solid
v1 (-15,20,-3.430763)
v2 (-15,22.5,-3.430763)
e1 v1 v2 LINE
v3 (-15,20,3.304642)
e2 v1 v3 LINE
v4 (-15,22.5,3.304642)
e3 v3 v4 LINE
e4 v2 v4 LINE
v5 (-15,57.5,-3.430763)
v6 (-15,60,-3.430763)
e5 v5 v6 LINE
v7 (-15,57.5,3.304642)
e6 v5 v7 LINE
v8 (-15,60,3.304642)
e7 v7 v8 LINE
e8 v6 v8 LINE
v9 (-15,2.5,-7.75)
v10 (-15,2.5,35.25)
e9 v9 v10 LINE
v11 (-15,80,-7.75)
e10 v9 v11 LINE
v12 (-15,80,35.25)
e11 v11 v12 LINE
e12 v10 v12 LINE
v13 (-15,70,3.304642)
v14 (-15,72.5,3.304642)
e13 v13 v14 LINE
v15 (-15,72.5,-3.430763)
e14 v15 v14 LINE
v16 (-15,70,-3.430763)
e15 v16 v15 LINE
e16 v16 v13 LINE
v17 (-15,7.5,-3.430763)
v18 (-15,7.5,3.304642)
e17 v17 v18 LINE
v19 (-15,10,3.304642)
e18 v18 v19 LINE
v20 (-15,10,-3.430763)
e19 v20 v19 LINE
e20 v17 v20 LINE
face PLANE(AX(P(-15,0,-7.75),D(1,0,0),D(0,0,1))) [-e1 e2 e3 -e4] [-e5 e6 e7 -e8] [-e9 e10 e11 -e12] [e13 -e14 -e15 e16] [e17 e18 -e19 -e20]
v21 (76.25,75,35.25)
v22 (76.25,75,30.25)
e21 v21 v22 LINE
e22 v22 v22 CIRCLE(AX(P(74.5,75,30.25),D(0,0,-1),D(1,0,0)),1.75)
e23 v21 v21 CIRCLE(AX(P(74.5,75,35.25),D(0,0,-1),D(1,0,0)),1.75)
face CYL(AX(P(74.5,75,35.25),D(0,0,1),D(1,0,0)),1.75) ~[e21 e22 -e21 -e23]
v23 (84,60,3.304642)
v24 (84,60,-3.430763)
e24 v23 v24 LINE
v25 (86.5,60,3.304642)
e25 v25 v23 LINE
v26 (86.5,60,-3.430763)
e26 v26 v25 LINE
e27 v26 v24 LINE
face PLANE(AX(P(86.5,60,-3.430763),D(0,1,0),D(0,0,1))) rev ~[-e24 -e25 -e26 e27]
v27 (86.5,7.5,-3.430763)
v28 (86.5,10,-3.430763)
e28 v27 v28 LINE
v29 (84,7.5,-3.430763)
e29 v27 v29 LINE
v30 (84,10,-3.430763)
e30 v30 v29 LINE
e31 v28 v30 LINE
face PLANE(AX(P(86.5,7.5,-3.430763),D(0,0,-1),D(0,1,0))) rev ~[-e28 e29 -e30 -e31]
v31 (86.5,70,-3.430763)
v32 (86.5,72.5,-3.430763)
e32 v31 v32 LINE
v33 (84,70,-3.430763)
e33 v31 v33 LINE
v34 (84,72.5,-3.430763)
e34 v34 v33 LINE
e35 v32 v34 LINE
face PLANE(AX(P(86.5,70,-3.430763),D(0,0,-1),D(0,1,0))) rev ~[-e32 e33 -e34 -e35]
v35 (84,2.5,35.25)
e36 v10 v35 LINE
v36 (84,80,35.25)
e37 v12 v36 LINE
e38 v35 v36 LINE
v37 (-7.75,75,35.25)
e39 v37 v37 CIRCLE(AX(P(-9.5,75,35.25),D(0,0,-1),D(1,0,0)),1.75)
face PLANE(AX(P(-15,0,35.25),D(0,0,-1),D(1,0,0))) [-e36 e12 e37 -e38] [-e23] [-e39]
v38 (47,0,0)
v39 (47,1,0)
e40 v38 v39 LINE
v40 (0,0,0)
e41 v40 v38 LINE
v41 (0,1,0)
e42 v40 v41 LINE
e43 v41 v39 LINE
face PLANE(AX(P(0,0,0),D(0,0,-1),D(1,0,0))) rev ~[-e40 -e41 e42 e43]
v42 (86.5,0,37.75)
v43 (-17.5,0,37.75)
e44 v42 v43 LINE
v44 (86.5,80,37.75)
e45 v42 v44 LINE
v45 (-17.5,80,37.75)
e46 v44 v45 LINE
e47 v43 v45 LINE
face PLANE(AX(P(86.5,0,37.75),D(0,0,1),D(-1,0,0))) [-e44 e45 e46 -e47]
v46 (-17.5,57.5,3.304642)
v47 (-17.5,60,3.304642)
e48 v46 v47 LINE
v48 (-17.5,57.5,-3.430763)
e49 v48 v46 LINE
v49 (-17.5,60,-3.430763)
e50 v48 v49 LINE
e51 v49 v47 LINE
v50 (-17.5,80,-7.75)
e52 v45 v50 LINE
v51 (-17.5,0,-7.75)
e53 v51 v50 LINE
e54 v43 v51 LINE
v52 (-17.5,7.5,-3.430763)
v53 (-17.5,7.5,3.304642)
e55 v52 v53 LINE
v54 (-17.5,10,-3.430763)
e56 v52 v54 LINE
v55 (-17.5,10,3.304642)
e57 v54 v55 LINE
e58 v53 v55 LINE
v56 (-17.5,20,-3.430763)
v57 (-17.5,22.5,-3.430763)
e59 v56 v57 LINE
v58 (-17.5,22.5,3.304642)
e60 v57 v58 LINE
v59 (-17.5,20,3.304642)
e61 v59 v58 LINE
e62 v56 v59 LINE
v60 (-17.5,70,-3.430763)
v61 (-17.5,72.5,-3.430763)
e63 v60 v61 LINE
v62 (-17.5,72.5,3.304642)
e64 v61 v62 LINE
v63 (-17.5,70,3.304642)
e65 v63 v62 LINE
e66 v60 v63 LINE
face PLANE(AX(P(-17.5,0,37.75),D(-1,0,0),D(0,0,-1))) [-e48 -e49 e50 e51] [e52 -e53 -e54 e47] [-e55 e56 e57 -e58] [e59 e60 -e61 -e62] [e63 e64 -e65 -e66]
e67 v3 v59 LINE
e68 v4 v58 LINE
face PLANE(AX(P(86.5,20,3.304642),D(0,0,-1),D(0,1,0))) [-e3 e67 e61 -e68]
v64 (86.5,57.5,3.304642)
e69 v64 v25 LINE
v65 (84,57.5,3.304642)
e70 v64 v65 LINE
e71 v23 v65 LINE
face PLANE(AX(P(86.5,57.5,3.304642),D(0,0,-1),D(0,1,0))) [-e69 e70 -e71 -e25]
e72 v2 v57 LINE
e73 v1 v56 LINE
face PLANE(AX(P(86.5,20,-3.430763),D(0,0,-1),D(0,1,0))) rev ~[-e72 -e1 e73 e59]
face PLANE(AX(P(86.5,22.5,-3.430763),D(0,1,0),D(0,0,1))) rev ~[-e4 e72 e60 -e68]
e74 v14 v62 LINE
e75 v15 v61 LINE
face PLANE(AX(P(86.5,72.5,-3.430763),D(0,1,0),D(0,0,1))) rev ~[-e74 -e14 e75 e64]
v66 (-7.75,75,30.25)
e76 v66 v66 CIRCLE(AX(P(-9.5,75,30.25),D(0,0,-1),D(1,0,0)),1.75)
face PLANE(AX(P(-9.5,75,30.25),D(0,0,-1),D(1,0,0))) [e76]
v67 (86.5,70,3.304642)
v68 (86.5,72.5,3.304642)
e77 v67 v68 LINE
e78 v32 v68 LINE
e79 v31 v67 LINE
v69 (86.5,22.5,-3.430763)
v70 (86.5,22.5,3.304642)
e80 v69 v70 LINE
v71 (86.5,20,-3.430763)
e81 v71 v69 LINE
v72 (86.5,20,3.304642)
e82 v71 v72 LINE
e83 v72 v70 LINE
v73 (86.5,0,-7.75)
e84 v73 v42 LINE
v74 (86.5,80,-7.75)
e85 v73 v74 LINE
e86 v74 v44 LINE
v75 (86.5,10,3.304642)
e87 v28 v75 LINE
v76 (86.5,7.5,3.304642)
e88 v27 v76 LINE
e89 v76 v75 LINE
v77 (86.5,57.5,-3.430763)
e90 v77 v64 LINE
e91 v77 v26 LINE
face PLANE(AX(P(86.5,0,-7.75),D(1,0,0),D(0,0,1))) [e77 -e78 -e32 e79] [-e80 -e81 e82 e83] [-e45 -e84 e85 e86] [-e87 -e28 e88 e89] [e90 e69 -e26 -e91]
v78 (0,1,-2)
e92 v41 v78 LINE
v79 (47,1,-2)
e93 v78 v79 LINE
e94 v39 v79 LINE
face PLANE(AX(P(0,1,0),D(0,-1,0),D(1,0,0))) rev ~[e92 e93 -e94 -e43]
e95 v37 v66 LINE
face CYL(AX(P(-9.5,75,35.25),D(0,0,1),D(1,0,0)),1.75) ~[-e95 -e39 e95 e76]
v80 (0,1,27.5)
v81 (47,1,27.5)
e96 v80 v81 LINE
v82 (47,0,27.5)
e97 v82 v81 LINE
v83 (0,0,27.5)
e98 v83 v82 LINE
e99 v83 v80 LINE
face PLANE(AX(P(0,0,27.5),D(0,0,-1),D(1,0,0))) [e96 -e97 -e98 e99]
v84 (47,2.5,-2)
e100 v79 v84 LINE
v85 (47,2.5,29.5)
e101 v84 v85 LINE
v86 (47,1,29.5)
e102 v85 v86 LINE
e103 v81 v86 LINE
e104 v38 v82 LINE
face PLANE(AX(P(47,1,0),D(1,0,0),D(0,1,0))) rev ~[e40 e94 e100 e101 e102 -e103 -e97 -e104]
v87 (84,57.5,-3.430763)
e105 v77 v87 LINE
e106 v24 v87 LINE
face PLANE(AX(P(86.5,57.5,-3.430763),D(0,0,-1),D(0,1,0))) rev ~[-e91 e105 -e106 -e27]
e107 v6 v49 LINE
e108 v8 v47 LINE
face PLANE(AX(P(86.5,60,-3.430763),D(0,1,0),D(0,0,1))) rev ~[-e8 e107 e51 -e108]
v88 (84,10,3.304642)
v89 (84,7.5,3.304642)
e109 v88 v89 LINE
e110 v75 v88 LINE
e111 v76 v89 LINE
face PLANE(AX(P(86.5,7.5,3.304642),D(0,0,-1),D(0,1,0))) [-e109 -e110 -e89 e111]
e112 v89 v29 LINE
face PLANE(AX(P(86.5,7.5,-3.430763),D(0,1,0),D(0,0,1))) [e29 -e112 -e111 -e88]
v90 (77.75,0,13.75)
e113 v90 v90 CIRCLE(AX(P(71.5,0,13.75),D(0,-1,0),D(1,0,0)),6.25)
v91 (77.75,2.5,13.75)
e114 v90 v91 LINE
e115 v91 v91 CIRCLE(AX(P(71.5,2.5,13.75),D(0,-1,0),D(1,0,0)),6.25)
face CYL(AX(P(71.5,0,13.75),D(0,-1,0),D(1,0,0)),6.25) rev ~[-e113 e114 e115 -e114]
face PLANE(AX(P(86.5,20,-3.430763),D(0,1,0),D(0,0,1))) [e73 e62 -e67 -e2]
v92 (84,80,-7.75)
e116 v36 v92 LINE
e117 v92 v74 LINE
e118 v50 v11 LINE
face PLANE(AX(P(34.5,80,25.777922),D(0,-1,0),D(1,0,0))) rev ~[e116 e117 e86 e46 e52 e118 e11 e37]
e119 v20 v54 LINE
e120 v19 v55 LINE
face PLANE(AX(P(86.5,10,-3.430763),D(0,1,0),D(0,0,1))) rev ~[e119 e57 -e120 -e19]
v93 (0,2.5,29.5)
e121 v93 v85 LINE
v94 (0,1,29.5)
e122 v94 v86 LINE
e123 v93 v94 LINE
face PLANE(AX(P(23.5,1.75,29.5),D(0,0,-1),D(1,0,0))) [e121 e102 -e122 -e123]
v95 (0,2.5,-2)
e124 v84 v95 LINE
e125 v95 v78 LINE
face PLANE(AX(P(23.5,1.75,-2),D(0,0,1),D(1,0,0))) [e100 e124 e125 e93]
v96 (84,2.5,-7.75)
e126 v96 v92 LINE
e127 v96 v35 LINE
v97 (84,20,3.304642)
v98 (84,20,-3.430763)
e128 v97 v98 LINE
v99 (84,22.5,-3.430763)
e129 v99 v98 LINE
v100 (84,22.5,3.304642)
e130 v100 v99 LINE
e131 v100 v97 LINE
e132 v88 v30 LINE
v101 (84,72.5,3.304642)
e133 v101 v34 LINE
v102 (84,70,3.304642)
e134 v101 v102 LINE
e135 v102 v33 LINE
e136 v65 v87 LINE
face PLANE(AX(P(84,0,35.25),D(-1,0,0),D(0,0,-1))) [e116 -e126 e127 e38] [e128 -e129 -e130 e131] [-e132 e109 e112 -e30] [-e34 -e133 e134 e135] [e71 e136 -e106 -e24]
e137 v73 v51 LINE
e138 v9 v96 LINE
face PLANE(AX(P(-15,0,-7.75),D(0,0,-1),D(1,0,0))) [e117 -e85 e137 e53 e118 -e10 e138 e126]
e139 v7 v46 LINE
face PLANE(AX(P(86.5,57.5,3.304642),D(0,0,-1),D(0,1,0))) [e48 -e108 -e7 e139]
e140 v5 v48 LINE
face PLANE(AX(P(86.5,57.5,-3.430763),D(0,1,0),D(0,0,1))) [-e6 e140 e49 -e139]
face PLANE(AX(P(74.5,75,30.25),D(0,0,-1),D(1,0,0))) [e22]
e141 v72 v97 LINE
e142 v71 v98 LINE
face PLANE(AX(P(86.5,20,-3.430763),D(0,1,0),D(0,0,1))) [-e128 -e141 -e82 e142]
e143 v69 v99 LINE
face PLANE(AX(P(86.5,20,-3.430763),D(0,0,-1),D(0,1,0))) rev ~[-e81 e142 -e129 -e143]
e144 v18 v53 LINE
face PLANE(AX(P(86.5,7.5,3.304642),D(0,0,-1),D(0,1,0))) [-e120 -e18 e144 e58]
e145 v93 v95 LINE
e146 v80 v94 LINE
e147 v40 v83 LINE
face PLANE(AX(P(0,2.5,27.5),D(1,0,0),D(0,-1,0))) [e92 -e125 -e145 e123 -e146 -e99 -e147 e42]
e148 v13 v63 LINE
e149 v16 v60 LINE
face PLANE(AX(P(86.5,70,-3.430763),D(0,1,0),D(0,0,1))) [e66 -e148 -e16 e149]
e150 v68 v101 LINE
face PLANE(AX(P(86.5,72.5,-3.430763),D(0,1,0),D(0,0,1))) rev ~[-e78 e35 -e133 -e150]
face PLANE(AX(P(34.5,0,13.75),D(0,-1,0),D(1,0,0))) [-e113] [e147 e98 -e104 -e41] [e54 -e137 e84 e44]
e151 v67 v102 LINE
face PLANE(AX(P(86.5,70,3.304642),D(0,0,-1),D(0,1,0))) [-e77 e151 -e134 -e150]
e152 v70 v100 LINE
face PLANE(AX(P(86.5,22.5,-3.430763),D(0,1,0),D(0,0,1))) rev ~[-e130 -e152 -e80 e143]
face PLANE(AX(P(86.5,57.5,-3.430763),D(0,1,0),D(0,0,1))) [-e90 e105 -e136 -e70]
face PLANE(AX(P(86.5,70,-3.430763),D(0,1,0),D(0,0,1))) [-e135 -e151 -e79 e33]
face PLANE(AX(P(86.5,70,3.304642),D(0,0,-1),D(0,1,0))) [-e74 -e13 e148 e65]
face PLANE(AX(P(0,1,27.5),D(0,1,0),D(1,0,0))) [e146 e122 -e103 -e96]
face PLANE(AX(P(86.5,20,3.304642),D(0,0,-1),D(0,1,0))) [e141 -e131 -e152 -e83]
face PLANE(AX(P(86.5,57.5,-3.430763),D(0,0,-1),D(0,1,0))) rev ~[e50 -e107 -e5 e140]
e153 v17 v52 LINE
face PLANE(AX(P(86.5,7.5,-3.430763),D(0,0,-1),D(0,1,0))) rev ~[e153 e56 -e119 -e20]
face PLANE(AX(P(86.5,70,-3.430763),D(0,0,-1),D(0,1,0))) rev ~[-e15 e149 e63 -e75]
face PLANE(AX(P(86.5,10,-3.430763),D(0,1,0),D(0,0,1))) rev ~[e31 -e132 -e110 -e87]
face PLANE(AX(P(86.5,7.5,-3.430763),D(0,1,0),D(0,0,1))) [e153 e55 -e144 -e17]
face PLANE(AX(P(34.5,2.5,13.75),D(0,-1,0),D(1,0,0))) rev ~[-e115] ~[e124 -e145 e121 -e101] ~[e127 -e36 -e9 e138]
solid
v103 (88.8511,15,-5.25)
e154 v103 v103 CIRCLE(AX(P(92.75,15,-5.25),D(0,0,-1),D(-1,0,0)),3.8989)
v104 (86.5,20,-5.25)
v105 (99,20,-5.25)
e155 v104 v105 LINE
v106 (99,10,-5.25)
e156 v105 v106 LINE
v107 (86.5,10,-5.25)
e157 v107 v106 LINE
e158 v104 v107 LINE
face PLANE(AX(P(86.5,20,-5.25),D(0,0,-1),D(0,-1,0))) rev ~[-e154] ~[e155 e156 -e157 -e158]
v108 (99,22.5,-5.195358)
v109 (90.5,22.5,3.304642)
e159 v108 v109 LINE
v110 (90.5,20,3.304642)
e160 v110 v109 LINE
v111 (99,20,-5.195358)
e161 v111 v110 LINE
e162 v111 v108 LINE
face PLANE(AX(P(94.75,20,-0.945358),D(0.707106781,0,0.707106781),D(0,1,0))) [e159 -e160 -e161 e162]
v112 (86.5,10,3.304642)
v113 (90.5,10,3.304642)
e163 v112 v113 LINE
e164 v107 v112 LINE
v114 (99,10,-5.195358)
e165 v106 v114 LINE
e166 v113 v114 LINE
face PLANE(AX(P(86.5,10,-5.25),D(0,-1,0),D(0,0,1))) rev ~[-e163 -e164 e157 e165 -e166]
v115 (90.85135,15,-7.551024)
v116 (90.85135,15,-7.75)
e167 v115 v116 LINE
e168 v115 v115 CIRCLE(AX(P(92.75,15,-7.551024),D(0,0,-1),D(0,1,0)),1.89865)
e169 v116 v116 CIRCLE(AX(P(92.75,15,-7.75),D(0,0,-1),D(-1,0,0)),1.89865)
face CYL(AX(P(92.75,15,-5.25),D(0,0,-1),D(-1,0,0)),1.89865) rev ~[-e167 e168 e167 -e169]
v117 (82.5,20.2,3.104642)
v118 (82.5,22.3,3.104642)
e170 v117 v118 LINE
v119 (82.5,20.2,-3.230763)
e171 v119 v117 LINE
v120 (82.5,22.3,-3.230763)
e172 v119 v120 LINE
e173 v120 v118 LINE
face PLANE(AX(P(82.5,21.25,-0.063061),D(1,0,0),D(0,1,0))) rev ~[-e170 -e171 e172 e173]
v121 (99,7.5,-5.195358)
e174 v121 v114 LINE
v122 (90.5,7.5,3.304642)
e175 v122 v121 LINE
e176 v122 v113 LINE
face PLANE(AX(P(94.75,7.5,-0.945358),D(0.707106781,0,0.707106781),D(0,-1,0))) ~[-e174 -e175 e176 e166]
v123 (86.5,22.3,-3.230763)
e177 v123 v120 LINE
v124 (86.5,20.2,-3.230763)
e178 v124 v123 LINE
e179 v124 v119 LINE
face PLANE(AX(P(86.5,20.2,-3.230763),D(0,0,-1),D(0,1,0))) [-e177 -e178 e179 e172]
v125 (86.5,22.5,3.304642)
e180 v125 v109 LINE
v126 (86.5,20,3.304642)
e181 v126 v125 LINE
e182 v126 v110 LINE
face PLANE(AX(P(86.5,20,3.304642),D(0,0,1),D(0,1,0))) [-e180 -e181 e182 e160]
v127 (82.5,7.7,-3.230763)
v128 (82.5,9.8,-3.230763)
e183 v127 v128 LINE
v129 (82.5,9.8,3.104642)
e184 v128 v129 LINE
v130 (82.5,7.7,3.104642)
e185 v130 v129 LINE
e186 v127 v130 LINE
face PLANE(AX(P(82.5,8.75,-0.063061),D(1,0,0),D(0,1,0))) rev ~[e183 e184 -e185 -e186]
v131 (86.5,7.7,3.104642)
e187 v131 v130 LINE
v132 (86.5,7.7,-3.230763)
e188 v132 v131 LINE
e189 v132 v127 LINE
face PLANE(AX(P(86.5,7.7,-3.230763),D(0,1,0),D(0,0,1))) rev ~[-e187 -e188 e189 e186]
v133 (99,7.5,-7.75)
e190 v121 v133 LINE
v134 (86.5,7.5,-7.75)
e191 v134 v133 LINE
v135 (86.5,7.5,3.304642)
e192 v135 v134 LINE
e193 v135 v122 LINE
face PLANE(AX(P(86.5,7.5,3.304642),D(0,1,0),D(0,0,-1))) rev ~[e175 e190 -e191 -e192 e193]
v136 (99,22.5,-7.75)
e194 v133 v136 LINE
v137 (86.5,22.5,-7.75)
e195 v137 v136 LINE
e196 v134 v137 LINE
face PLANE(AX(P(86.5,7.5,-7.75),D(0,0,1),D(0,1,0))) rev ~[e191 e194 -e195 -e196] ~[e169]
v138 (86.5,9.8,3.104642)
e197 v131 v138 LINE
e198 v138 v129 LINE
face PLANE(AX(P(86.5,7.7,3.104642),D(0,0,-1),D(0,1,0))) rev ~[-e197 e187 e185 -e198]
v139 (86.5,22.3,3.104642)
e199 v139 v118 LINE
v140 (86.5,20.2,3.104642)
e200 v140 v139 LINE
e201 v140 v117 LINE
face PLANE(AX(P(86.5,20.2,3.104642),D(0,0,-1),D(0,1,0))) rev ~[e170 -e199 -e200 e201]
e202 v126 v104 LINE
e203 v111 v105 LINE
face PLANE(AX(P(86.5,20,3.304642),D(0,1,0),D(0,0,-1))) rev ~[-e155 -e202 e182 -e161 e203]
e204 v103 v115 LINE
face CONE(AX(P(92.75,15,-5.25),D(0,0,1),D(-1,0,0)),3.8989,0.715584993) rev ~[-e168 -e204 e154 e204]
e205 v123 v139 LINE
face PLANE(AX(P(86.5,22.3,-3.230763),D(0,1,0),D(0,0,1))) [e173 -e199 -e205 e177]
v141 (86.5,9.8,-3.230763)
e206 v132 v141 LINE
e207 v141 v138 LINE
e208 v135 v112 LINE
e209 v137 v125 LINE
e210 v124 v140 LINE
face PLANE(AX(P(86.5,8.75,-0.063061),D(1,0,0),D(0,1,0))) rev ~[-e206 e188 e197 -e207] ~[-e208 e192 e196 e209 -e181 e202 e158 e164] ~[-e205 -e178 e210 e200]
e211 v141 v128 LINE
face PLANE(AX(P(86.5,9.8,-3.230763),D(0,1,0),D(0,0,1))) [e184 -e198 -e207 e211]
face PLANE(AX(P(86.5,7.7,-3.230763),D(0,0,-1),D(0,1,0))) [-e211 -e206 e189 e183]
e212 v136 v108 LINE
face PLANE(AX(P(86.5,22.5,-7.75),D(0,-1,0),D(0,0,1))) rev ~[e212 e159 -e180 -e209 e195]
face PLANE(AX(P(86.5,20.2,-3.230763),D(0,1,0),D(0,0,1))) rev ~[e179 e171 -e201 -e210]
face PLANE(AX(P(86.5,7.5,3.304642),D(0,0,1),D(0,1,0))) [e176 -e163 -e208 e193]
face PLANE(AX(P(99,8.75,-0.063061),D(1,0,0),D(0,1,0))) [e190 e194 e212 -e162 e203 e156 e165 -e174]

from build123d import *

# Parameters (mm, degrees)
F2_DEPTH        = 80
F1_W            = 99
F1_H            = 43
F1_W_2          = 47
F1_H_2          = 27.5
F1_R            = 6.25
F3_DEPTH        = 2.5
F4_R            = 1.75
F5_DEPTH        = 5
F6_W            = 2.5
F6_H            = 6.7354051862
F6_W_2          = 2.1
F6_H_2          = 6.3354051862
F7_DEPTH        = 104
F8_DEPTH        = 12.5
F9_DEPTH        = 4
F10_SIZE        = 8.5
F12_D           = 3.7973
F12_CSINK_D     = 7.7978
F12_CSINK_ANGLE = 82
F14_DEPTH       = 2
F15_W           = 47
F15_H           = 1.5
F16_DEPTH       = 2


with BuildPart() as f2:
    # F1 (on Front) → F2 (new body)
    with BuildSketch(Plane.XZ):
        Polygon((-15, -7.75), (-15, 35.25), (84, 35.25), (84, -7.75), (86.5, -7.75), (86.5, 37.75), (-17.5, 37.75), (-17.5, -7.75), align=None)
    extrude(amount=-F2_DEPTH)

    # F1 (on Front) → F3 (join)
    with BuildSketch(Plane.XZ):
        with Locations((34.5, 13.75)):
            Rectangle(F1_W, F1_H)
        with Locations((23.5, 13.75)):
            Rectangle(F1_W_2, F1_H_2, mode=Mode.SUBTRACT)
        with Locations((71.5, 13.75)):
            Circle(F1_R, mode=Mode.SUBTRACT)
    extrude(amount=-F3_DEPTH)

    # F4 (on face) → F5 (join)
    with BuildSketch(Plane(origin=(0, 0, 35.25), x_dir=(1, 0, 0), z_dir=(0, 0, -1))):
        with Locations((-9.5, -75)):
            Circle(F4_R)
        with Locations((74.5, -75)):
            Circle(F4_R)
    extrude(amount=F5_DEPTH)

    # F6 (on face) → F7 (cut, through all)
    with BuildSketch(Plane.YZ.offset(86.5)):
        with Locations((8.75, -0.0630606664)):
            Rectangle(F6_W, F6_H)
        with Locations((8.75, -0.0630606664)):
            Rectangle(F6_W_2, F6_H_2, mode=Mode.SUBTRACT)
        with Locations((21.25, -0.0630606664)):
            Rectangle(F6_W, F6_H)
        with Locations((21.25, -0.0630606664)):
            Rectangle(F6_W_2, F6_H_2, mode=Mode.SUBTRACT)
        with Locations((58.75, -0.0630606664)):
            Rectangle(F6_W, F6_H)
        with Locations((71.25, -0.0630606664)):
            Rectangle(F6_W, F6_H)
        with Locations((8.75, -0.0630606664)):
            Rectangle(F6_W_2, F6_H_2)
        with Locations((21.25, -0.0630606664)):
            Rectangle(F6_W_2, F6_H_2)
    extrude(amount=-F7_DEPTH, mode=Mode.SUBTRACT)

    # F13 (on face) → F14 (cut)
    with BuildSketch(Plane.XY):
        Polygon((47, 2.5), (0, 2.5), (0, 1), (47, 1), (47, 1.25), align=None)
    extrude(amount=-F14_DEPTH, mode=Mode.SUBTRACT)

    # F15 (on face) → F16 (cut)
    with BuildSketch(Plane(origin=(0, 0, 27.5), x_dir=(1, 0, 0), z_dir=(0, 0, -1))):
        with Locations((23.5, -1.75)):
            Rectangle(F15_W, F15_H)
    extrude(amount=-F16_DEPTH, mode=Mode.SUBTRACT)


with BuildPart() as f8:
    # F6 (on face) → F8 (new body)
    with BuildSketch(Plane.YZ.offset(86.5)):
        with Locations((8.75, -0.0630606664)):
            Rectangle(F6_W, F6_H)
        with Locations((8.75, -0.0630606664)):
            Rectangle(F6_W_2, F6_H_2, mode=Mode.SUBTRACT)
        Polygon((7.5, -3.4307632595), (7.5, -7.75), (15, -7.75), (22.5, -7.75), (22.5, -3.4307632595), (20, -3.4307632595), (20, -5.25), (15, -5.25), (10, -5.25), (10, -3.4307632595), align=None)
        with Locations((21.25, -0.0630606664)):
            Rectangle(F6_W, F6_H)
        with Locations((21.25, -0.0630606664)):
            Rectangle(F6_W_2, F6_H_2, mode=Mode.SUBTRACT)
        with Locations((8.75, -0.0630606664)):
            Rectangle(F6_W_2, F6_H_2)
        with Locations((21.25, -0.0630606664)):
            Rectangle(F6_W_2, F6_H_2)
    extrude(amount=F8_DEPTH)

    # F6 (on face) → F9 (join)
    with BuildSketch(Plane.YZ.offset(86.5)):
        with Locations((8.75, -0.0630606664)):
            Rectangle(F6_W_2, F6_H_2)
        with Locations((21.25, -0.0630606664)):
            Rectangle(F6_W_2, F6_H_2)
    extrude(amount=-F9_DEPTH)

    # F10
    f10_edges = [f8.edges().sort_by_distance(p)[0] for p in [
        (99, 8.75, 3.304642),
        (99, 21.25, 3.304642),
    ]]
    chamfer(f10_edges, length=F10_SIZE)

    # F12 (through all)
    with Locations(Plane.XY.offset(-5.25)):
        with Locations((92.75, 15)):
            CounterSinkHole(F12_D / 2, F12_CSINK_D / 2, counter_sink_angle=F12_CSINK_ANGLE)


solid = Compound([f2.part, f8.part])
